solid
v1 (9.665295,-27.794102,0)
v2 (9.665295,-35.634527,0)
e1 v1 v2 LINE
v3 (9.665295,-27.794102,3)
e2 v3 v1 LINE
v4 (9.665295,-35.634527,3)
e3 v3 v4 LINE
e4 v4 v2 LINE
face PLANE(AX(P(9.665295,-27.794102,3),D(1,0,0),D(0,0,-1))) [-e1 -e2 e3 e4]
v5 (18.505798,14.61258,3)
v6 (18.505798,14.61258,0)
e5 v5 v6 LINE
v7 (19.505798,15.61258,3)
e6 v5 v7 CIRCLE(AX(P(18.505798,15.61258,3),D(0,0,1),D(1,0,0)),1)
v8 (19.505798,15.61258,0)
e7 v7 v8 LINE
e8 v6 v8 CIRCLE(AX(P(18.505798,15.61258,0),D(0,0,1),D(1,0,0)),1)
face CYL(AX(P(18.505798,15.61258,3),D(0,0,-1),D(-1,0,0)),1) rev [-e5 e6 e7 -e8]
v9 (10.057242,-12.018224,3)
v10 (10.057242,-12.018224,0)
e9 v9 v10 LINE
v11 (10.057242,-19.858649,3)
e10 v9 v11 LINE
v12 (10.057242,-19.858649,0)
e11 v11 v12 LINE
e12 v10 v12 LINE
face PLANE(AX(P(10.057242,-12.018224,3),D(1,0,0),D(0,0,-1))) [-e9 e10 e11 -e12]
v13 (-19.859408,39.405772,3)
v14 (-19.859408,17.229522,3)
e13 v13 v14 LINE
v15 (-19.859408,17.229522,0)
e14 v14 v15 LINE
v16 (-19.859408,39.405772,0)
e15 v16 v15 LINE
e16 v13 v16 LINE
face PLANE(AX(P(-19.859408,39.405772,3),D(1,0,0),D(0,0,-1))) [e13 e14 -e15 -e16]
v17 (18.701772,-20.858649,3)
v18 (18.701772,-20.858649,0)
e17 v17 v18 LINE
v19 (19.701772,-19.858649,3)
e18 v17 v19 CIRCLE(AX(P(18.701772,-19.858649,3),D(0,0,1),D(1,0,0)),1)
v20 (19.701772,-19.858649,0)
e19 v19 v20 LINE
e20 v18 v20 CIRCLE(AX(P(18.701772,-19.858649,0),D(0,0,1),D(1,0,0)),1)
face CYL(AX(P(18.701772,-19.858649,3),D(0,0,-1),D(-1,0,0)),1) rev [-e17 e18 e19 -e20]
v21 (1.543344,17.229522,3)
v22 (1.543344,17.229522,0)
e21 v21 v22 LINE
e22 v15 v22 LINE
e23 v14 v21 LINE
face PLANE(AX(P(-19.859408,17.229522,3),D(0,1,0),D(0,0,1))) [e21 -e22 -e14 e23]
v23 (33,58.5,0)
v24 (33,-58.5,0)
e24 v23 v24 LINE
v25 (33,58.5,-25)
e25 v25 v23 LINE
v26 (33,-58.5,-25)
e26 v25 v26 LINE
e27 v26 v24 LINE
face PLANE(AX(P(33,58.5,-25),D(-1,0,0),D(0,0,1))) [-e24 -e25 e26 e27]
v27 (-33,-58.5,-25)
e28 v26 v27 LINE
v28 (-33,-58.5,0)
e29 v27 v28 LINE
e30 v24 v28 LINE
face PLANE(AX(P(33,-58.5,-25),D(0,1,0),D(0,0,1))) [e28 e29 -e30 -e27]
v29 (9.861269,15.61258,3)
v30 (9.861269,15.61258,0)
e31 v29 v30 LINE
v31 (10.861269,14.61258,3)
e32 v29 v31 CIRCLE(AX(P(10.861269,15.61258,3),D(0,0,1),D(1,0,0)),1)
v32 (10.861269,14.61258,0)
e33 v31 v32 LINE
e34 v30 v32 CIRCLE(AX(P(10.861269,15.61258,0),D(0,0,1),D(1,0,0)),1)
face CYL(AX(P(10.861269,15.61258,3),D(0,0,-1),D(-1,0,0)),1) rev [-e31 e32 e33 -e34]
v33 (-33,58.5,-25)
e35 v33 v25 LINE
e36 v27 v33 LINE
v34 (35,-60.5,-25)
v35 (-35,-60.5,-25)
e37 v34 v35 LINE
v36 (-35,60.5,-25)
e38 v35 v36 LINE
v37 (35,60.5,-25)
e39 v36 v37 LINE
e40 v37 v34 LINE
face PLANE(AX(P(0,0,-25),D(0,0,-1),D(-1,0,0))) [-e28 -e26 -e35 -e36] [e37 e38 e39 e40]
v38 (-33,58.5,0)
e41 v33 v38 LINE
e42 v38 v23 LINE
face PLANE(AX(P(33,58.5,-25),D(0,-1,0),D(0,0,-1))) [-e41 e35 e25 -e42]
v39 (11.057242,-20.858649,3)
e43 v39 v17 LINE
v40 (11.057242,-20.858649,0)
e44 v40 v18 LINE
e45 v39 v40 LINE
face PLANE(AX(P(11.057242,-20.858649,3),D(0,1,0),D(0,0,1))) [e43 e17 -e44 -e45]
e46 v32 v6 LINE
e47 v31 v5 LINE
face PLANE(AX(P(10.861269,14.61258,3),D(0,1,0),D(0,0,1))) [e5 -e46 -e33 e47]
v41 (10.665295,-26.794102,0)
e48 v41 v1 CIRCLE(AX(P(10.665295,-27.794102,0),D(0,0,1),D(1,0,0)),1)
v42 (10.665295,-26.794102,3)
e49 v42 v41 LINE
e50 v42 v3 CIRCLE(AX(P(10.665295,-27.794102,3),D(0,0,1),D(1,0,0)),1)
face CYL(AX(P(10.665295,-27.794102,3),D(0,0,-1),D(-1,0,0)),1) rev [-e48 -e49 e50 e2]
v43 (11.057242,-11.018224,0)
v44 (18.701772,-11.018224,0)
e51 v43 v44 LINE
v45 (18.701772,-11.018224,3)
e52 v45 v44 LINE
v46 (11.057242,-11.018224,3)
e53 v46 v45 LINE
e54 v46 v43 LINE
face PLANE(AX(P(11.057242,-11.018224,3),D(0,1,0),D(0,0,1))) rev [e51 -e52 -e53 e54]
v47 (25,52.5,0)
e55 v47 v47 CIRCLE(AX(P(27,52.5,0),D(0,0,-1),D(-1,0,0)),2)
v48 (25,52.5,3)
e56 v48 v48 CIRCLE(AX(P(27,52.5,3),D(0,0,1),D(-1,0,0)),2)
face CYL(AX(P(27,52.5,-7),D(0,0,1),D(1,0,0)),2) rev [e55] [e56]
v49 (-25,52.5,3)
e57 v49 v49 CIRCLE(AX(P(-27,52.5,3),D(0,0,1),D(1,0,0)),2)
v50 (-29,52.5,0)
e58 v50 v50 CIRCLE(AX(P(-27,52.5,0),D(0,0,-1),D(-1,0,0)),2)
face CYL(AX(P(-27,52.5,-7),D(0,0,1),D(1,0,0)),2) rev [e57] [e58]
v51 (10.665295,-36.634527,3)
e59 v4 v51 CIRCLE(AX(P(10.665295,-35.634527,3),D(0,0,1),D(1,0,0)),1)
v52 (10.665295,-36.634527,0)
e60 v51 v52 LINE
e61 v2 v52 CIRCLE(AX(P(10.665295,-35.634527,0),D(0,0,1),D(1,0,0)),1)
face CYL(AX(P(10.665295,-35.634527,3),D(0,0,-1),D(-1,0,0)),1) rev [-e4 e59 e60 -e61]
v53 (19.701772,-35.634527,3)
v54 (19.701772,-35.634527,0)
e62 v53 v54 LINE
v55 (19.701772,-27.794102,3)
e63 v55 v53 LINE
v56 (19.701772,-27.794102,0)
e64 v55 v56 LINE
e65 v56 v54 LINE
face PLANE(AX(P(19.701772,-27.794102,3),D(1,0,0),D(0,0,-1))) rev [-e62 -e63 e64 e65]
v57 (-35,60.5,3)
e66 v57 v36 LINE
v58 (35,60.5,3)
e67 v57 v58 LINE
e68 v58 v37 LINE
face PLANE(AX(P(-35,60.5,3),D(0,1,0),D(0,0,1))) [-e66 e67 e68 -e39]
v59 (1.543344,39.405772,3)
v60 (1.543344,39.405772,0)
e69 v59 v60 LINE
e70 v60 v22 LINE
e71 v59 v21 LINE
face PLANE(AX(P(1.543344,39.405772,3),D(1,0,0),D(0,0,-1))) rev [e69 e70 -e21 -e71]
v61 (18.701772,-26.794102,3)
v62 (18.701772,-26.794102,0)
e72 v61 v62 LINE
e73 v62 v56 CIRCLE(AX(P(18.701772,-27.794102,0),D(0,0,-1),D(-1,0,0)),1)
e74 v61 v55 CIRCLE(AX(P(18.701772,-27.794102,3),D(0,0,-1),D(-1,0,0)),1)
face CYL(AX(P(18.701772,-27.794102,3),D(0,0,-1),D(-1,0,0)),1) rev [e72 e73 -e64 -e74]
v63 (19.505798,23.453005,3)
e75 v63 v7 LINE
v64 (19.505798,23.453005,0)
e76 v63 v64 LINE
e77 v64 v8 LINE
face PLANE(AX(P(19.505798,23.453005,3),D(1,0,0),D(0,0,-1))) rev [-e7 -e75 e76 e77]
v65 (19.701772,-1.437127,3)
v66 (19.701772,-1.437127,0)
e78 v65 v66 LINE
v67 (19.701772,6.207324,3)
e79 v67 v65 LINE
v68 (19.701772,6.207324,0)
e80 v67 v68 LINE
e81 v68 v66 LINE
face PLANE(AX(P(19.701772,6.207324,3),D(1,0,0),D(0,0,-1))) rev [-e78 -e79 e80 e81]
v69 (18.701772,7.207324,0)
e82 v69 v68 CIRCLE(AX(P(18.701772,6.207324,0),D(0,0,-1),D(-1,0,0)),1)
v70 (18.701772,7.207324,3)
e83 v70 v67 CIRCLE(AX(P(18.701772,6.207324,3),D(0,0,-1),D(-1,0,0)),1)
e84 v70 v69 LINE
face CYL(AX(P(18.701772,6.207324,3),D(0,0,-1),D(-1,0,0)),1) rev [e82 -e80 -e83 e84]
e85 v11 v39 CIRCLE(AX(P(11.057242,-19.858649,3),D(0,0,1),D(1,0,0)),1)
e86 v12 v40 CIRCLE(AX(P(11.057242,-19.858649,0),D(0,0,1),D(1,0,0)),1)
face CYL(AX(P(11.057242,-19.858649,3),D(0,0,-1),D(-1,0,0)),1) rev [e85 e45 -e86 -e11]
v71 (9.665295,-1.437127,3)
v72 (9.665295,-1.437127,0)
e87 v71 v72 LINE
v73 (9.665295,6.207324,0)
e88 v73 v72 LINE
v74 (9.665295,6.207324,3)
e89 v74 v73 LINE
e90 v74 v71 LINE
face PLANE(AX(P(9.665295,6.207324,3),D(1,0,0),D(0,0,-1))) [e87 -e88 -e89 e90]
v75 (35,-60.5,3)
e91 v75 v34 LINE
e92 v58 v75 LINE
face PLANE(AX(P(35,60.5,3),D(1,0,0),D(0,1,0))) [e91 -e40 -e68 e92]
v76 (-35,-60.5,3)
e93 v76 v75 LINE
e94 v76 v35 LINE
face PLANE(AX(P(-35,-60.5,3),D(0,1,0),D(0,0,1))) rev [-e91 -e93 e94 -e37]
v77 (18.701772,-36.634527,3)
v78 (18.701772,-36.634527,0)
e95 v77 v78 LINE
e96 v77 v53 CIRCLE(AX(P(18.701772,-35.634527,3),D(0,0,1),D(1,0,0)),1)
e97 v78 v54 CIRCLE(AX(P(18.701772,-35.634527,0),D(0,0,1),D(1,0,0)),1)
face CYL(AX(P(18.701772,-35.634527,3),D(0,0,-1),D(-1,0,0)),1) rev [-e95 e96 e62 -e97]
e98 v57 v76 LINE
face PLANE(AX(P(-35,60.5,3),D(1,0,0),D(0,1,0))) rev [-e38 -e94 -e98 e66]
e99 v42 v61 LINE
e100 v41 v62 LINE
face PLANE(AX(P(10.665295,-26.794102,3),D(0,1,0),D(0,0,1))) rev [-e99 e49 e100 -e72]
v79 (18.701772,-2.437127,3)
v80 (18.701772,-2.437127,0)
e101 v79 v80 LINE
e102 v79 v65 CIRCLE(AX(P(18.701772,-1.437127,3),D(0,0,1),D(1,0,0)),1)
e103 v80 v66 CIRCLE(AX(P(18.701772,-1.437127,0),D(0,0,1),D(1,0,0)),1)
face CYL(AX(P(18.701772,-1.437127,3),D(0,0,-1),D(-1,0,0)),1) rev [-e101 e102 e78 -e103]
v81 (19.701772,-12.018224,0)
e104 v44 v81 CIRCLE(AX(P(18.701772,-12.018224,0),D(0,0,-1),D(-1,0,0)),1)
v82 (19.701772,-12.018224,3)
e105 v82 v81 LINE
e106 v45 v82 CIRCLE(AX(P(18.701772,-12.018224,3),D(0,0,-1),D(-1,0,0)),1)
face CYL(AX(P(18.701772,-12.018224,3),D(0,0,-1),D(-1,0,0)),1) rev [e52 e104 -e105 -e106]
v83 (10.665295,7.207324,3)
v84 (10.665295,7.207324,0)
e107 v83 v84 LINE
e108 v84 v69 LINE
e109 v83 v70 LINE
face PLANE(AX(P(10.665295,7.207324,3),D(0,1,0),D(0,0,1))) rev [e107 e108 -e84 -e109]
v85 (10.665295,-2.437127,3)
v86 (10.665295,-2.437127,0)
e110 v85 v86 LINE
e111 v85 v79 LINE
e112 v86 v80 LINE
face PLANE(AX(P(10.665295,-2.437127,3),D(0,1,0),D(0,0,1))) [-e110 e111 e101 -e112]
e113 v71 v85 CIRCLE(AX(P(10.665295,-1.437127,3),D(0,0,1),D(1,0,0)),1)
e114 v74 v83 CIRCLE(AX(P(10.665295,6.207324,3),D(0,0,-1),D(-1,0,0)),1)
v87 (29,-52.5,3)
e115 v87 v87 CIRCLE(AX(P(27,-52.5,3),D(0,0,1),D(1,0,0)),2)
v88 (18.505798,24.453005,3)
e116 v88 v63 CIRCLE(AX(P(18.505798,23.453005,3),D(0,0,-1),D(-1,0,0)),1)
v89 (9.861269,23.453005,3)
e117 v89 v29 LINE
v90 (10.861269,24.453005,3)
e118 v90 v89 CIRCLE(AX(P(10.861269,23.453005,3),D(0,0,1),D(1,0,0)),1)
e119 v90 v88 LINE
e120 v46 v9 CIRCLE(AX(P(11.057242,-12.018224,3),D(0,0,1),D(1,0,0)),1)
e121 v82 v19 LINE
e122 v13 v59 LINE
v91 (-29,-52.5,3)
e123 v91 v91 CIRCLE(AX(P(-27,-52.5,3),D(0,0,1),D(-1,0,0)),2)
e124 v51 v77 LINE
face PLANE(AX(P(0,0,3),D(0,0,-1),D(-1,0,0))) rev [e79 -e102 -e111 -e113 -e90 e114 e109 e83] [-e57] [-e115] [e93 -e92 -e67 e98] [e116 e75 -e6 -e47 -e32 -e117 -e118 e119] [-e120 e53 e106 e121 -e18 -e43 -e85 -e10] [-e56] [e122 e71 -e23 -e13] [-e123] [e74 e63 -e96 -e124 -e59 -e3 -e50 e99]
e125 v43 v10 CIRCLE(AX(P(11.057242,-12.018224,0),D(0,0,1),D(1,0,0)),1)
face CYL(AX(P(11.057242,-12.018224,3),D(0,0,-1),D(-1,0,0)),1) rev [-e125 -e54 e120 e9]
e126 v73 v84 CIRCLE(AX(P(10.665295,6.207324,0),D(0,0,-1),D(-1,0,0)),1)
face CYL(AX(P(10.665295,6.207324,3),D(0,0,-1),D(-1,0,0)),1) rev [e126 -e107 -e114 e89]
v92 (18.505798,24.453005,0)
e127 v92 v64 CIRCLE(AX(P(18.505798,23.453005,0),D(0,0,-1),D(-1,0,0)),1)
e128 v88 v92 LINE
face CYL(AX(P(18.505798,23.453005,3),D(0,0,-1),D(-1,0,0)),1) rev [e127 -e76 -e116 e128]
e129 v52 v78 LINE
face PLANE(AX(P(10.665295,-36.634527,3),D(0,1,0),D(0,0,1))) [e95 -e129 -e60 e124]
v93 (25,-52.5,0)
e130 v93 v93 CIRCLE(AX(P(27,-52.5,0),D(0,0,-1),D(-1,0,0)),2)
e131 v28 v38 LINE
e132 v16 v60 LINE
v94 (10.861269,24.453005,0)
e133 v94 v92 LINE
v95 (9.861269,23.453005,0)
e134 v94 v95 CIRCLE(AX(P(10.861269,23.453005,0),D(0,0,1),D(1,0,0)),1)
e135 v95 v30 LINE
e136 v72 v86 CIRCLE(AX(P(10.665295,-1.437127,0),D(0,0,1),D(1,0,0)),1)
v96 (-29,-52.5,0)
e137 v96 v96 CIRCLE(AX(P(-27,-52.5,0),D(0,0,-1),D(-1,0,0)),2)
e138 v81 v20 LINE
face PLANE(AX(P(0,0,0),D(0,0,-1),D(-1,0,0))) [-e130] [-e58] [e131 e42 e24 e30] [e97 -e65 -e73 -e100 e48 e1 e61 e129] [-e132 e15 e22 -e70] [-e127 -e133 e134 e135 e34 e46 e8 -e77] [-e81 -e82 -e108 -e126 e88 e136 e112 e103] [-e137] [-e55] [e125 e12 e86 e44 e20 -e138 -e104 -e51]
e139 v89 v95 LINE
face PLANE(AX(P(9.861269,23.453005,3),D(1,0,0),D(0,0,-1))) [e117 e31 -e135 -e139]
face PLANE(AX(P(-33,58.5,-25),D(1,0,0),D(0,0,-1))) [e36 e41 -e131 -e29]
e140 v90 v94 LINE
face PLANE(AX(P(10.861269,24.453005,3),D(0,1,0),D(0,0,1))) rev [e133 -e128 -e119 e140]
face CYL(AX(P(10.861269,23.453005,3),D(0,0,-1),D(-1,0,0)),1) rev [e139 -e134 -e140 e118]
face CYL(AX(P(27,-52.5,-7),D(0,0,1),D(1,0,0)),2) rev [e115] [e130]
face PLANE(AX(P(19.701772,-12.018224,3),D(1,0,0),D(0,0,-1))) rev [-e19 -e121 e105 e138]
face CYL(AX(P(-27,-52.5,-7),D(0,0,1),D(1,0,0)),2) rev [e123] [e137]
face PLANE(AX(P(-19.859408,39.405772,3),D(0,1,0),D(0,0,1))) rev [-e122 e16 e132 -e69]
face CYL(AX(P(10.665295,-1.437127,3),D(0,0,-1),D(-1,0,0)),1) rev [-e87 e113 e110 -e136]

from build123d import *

# Parameters (mm, degrees)
SALIENTE_EXTRUIR1_OUTLINE_W   = 70
SALIENTE_EXTRUIR1_OUTLINE_H   = 121
SALIENTE_EXTRUIR1_OUTLINE_W_2 = 21.402751614
SALIENTE_EXTRUIR1_OUTLINE_H_2 = 22.176249264
SALIENTE_EXTRUIR1_DEPTH       = 3
CROQUIS3_W                    = 70
CROQUIS3_H                    = 121
CROQUIS3_W_2                  = 66
CROQUIS3_H_2                  = 117
SALIENTE_EXTRUIR2_DEPTH       = 25
CROQUIS6_R                    = 2
CORTAR_EXTRUIR1_DEPTH         = 10


# Read off the part's stored shape, not the designer's step: Saliente-Extruir1
with BuildPart() as part:
    # Saliente-Extruir1 outline → Saliente-Extruir1 (new body)
    with BuildSketch(Plane.XY):
        Rectangle(SALIENTE_EXTRUIR1_OUTLINE_W, SALIENTE_EXTRUIR1_OUTLINE_H)
        with BuildLine():
            Line((10.665295135, -26.794102385), (18.701771575, -26.794102385))
            ThreePointArc((18.701771575, -26.794102385), (19.408878356, -27.086995604), (19.701771575, -27.794102385))
            Line((19.701771575, -27.794102385), (19.701771575, -35.634526795))
            ThreePointArc((19.701771575, -35.634526795), (19.408878356, -36.341633576), (18.701771575, -36.634526795))
            Line((18.701771575, -36.634526795), (10.665295135, -36.634526795))
            ThreePointArc((10.665295135, -36.634526795), (9.958188354, -36.341633576), (9.665295135, -35.634526795))
            Line((9.665295135, -35.634526795), (9.665295135, -27.794102385))
            ThreePointArc((9.665295135, -27.794102385), (9.958188354, -27.086995604), (10.665295135, -26.794102385))
        make_face(mode=Mode.SUBTRACT)
        with BuildLine():
            Line((10.057242416, -19.858648736), (10.057242416, -12.018224326))
            ThreePointArc((10.057242416, -12.018224326), (10.350135635, -11.311117545), (11.057242416, -11.018224326))
            Line((11.057242416, -11.018224326), (18.701771575, -11.018224326))
            ThreePointArc((18.701771575, -11.018224326), (19.408878356, -11.311117545), (19.701771575, -12.018224326))
            Line((19.701771575, -12.018224326), (19.701771575, -19.858648736))
            ThreePointArc((19.701771575, -19.858648736), (19.408878356, -20.565755517), (18.701771575, -20.858648736))
            Line((18.701771575, -20.858648736), (11.057242416, -20.858648736))
            ThreePointArc((11.057242416, -20.858648736), (10.350135635, -20.565755517), (10.057242416, -19.858648736))
        make_face(mode=Mode.SUBTRACT)
        with Locations((-9.158031826, 28.317647119)):
            Rectangle(SALIENTE_EXTRUIR1_OUTLINE_W_2, SALIENTE_EXTRUIR1_OUTLINE_H_2, mode=Mode.SUBTRACT)
        with BuildLine():
            Line((9.665295135, -1.437126531), (9.665295135, 6.207324239))
            ThreePointArc((9.665295135, 6.207324239), (9.958188354, 6.91443102), (10.665295135, 7.207324239))
            Line((10.665295135, 7.207324239), (18.701771575, 7.207324239))
            ThreePointArc((18.701771575, 7.207324239), (19.408878356, 6.91443102), (19.701771575, 6.207324239))
            Line((19.701771575, 6.207324239), (19.701771575, -1.437126531))
            ThreePointArc((19.701771575, -1.437126531), (19.408878356, -2.144233312), (18.701771575, -2.437126531))
            Line((18.701771575, -2.437126531), (10.665295135, -2.437126531))
            ThreePointArc((10.665295135, -2.437126531), (9.958188354, -2.144233312), (9.665295135, -1.437126531))
        make_face(mode=Mode.SUBTRACT)
        with BuildLine():
            Line((9.861268776, 15.612580192), (9.861268776, 23.453004601))
            ThreePointArc((9.861268776, 23.453004601), (10.154161995, 24.160111382), (10.861268776, 24.453004601))
            Line((10.861268776, 24.453004601), (18.505797934, 24.453004601))
            ThreePointArc((18.505797934, 24.453004601), (19.212904715, 24.160111382), (19.505797934, 23.453004601))
            Line((19.505797934, 23.453004601), (19.505797934, 15.612580192))
            ThreePointArc((19.505797934, 15.612580192), (19.212904715, 14.905473411), (18.505797934, 14.612580192))
            Line((18.505797934, 14.612580192), (10.861268776, 14.612580192))
            ThreePointArc((10.861268776, 14.612580192), (10.154161994, 14.90547341), (9.861268776, 15.612580192))
        make_face(mode=Mode.SUBTRACT)
    extrude(amount=SALIENTE_EXTRUIR1_DEPTH)

    # Croquis3 → Saliente-Extruir2 (add)
    with BuildSketch(Plane(origin=(0, 0, 0), x_dir=(-1, 0, 0), z_dir=(0, 0, -1))):
        Rectangle(CROQUIS3_W, CROQUIS3_H)
        Rectangle(CROQUIS3_W_2, CROQUIS3_H_2, mode=Mode.SUBTRACT)
    extrude(amount=SALIENTE_EXTRUIR2_DEPTH)

    # Croquis6 → Cortar-Extruir1 (cut)
    with BuildSketch(Plane.XY.offset(3)):
        with Locations((-27, 52.5)):
            Circle(CROQUIS6_R)
        with Locations(Location((-27, -52.5, 0), (0, 0, 180))):
            Circle(CROQUIS6_R)
        with Locations((27, -52.5)):
            Circle(CROQUIS6_R)
        with Locations(Location((27, 52.5, 0), (0, 0, 180))):
            Circle(CROQUIS6_R)
    extrude(amount=-CORTAR_EXTRUIR1_DEPTH, mode=Mode.SUBTRACT)


solid = part.part
